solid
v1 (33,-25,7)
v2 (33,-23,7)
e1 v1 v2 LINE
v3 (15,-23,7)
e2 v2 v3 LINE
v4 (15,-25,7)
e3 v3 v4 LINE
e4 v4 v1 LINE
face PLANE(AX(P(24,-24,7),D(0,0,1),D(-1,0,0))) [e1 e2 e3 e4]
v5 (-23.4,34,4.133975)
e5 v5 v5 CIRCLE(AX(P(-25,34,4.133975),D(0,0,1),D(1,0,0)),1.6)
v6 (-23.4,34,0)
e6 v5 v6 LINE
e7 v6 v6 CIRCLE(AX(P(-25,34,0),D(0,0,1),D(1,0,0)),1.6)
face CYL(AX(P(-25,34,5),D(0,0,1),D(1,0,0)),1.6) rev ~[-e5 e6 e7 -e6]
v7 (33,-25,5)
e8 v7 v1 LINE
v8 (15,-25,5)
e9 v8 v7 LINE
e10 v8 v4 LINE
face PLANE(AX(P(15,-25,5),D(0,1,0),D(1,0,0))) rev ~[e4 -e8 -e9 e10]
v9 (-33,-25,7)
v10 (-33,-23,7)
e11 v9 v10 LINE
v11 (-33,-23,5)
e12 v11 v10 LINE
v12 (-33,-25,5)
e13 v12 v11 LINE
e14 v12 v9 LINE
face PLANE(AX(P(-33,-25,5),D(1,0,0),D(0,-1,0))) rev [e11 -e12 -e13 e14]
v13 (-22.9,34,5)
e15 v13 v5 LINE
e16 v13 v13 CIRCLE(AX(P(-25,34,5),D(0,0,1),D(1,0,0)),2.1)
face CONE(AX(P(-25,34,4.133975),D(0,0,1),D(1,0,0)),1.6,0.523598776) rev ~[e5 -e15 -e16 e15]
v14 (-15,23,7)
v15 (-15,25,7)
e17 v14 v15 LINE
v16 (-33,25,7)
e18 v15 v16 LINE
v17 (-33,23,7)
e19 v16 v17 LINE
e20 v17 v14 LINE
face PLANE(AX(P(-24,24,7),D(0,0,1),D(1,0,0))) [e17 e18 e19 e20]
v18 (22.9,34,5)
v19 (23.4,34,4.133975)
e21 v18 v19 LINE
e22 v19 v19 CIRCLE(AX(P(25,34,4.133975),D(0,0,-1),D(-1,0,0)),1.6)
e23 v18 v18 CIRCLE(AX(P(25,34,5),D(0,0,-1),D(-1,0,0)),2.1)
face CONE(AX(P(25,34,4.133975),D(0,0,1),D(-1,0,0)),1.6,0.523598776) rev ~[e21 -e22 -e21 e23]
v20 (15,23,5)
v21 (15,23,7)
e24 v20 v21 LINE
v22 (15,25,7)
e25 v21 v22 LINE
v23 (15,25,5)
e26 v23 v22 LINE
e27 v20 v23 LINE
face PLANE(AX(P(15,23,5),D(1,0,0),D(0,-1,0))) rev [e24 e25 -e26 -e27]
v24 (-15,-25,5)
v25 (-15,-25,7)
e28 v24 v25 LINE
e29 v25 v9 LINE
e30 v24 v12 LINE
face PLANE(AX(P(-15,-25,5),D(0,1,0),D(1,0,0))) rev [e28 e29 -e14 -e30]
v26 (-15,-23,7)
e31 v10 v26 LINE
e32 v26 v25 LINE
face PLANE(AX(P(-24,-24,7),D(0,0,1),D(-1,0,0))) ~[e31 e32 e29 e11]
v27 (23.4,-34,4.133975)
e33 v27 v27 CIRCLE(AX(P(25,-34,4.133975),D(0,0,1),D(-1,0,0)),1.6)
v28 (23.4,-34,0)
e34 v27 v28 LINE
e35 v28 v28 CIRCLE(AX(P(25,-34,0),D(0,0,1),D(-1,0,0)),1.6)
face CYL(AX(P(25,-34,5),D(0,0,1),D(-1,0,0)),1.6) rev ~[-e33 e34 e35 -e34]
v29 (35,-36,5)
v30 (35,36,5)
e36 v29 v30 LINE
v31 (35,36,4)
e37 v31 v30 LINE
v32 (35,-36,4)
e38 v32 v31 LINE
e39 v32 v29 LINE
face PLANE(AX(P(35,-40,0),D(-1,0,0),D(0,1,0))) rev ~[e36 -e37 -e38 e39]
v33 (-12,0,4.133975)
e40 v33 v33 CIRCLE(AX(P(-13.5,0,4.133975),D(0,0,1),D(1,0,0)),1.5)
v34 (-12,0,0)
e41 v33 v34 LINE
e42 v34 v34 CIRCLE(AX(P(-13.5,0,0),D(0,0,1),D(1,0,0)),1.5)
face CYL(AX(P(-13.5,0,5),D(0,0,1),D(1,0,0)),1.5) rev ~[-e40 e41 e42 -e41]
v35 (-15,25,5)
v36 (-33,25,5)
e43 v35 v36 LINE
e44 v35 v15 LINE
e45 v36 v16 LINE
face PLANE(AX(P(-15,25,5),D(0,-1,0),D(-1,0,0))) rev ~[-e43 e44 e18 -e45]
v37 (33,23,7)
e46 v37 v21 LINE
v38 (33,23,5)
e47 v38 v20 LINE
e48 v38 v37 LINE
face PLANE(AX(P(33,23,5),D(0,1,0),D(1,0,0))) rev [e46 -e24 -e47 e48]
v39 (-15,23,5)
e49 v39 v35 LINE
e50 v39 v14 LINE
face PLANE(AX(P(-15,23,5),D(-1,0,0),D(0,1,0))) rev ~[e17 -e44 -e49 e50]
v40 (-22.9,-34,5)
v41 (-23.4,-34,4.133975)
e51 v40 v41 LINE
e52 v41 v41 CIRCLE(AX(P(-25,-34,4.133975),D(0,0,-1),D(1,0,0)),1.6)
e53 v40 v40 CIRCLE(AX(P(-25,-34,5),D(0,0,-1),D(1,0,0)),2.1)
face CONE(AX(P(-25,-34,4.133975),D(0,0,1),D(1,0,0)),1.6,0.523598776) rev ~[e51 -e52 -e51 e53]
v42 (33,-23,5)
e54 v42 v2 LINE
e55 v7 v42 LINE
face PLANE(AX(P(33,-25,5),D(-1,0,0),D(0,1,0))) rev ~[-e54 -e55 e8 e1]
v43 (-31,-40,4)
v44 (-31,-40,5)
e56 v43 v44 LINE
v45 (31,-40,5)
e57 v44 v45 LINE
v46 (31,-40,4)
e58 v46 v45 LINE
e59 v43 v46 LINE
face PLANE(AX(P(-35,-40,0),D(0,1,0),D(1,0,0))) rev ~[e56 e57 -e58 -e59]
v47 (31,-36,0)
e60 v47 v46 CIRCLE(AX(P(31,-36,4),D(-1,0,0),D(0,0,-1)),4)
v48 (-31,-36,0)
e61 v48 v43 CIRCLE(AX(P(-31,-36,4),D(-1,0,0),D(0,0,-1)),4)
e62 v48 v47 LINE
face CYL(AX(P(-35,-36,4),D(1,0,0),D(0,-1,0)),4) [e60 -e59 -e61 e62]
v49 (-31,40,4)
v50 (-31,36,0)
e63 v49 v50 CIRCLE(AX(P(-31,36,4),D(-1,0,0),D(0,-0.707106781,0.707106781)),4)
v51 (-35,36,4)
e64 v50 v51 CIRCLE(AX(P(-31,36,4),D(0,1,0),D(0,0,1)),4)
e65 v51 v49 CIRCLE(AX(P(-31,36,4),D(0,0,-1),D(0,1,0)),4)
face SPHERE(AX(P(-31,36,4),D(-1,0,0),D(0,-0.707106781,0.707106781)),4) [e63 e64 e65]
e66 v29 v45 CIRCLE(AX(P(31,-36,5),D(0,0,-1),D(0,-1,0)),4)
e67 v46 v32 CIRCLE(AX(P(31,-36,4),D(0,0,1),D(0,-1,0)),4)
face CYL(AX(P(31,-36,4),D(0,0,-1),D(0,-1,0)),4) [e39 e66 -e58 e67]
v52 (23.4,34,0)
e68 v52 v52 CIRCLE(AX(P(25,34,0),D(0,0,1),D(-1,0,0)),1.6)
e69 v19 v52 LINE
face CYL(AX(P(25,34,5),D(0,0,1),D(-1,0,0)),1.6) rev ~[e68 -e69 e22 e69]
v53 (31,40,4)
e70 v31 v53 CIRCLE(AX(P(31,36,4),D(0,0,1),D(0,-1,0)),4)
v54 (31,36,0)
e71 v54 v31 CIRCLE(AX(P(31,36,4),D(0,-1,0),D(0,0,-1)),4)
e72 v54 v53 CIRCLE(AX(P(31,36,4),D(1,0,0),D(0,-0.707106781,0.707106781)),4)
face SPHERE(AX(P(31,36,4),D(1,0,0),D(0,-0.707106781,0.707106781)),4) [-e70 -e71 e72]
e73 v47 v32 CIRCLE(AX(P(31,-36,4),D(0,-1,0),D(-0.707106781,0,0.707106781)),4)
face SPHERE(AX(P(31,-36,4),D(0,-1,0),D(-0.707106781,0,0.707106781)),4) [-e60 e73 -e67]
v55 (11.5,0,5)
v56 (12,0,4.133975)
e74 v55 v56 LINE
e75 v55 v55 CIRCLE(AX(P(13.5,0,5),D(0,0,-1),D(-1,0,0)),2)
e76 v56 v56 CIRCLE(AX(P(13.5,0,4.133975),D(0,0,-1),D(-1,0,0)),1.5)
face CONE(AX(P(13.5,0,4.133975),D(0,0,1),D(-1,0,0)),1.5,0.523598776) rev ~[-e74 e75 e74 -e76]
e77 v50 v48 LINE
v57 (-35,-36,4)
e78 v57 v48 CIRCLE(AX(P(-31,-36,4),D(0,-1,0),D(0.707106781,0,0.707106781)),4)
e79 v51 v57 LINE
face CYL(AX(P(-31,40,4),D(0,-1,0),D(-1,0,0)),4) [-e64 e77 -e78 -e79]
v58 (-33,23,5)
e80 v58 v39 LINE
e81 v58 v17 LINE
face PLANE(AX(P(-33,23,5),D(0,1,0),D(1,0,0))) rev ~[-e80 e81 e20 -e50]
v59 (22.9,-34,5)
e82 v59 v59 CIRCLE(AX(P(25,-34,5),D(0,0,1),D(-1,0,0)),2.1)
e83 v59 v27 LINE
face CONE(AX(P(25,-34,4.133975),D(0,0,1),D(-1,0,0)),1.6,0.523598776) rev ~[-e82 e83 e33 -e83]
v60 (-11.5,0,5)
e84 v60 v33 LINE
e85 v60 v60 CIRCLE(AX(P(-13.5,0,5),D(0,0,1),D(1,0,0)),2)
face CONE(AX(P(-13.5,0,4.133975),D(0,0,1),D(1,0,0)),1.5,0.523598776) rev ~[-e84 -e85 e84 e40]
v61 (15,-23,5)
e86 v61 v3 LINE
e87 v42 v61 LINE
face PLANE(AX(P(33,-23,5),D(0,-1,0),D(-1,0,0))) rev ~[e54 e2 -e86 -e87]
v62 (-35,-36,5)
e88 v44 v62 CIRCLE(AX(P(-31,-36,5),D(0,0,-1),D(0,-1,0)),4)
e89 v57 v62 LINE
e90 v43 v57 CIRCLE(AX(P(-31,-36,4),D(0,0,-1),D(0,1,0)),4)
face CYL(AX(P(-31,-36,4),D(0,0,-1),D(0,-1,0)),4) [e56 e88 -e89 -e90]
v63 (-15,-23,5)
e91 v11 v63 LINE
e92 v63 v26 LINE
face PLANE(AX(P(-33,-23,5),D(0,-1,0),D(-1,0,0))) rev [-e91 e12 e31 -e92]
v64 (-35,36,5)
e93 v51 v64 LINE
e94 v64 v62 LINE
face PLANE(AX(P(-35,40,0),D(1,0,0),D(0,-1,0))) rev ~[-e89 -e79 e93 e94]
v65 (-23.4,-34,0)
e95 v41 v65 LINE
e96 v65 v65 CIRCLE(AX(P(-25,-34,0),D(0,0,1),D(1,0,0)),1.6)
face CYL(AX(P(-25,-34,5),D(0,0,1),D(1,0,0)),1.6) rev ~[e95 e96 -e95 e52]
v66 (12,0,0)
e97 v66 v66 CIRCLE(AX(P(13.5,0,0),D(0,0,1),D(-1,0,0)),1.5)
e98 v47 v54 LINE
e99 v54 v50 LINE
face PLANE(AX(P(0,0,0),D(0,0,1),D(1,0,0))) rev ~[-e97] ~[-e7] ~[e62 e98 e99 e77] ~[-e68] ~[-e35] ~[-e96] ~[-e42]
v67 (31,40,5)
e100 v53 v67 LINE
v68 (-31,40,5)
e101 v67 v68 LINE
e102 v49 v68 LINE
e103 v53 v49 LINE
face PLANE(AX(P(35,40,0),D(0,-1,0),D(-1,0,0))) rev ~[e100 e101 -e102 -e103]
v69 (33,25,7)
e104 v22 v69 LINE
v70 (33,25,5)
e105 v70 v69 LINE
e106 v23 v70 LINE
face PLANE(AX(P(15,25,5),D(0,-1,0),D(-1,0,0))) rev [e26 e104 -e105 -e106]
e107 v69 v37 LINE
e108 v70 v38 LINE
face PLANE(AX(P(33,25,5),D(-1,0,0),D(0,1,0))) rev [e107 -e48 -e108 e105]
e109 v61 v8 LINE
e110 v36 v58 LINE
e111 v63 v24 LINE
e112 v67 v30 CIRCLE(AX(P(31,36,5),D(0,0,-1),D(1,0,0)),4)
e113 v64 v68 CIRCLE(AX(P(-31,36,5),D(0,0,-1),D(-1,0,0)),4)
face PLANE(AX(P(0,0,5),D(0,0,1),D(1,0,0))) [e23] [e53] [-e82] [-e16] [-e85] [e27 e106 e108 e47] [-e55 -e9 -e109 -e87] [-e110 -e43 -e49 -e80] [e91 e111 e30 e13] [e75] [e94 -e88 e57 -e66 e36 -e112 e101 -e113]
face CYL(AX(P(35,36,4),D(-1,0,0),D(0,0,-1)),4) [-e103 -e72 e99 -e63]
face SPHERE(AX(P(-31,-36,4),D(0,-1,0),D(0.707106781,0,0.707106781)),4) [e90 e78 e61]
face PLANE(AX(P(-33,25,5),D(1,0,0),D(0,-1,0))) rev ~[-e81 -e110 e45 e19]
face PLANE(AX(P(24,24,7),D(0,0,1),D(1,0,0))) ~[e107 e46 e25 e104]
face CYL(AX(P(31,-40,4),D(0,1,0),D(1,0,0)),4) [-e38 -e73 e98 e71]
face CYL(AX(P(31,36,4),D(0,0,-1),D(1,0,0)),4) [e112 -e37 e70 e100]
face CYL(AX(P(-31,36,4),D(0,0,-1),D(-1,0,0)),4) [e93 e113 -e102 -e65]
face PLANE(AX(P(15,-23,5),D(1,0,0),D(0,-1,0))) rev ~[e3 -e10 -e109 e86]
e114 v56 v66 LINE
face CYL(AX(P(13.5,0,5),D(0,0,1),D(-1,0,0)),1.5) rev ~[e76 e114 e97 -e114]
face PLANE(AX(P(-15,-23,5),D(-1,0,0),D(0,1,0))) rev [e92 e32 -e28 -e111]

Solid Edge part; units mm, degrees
sketch "Sketch1" plane through (0, 0, 0) normal (0, 0, 1) x (1, 0, 0)
  line L0 (-35, -40) -> (35, -40)
  line L1 (35, -40) -> (35, 40)
  line L2 (35, 40) -> (-35, 40)
  line L3 (-35, 40) -> (-35, -40)
  dimension "D1" = 80
  dimension "D2" = 70
extrude "Protrusion1" add sketch "Sketch1" along normal blind 5
sketch "Sketch2" plane through (0, 0, 5) normal (0, 0, 1) x (1, 0, 0)
  circle A0 centre (-25, 34) radius 1.6
  dimension "D1" = 6
  dimension "D2" = 10
  dimension "D3" = 3.2
extrude "Cutout1" cut sketch "Sketch2" against normal through all
mirror "Mirror1" about plane through (0, 0, 0) normal (1, 0, 0) of "Cutout1"
mirror "Mirror2" about plane through (0, 0, 0) normal (0, -1, 0) of "Cutout1", "Mirror1"
sketch "Sketch3" plane through (0, 0, 5) normal (0, 0, 1) x (1, 0, 0)
  circle A0 centre (-13.5, 0) radius 1.5
  dimension "D1" = 3
  dimension "D2" = 13.5
extrude "Cutout2" cut sketch "Sketch3" against normal through all
mirror "Mirror3" about plane through (0, 0, 0) normal (1, 0, 0) of "Cutout2"
sketch "Sketch4" plane through (0, 0, 5) normal (0, 0, 1) x (1, 0, 0)
  line L0 (-33, 23) -> (-15, 23)
  line L1 (-15, 23) -> (-15, 25)
  line L2 (-15, 25) -> (-33, 25)
  line L3 (-33, 25) -> (-33, 23)
  dimension "D1" = 18
  dimension "D2" = 2
  dimension "D3" = 2
  dimension "D4" = 15
extrude "Extrusionsausprägung_2" add sketch "Sketch4" along normal blind 2
mirror "Mirror4" about plane through (0, 0, 0) normal (0, -1, 0) of "Extrusionsausprägung_2"
mirror "Mirror5" about plane through (0, 0, 0) normal (1, 0, 0) of "Mirror4", "Extrusionsausprägung_2"
fillet "Verrundung_1" radius 4 4 edges at (0, 40, 0) (35, 0, 0) (-35, 0, 0) (0, -40, 0)
fillet "Verrundung_2" radius 4 8 edges at (33.8284, 38.8284, 1.1716) (35, 40, 4.5) (33.8284, -38.8284, 1.1716) (35, -40, 4.5) (-33.8284, -38.8284, 1.1716) (-35, -40, 4.5) (-33.8284, 38.8284, 1.1716) (-35, 40, 4.5)
chamfer "Fase_1" distance 0.5 angle 60 2 edges at (15, 0, 5) (-15, 0, 5) measured on face at (-24.0333, -25.8667, 5)
chamfer "Fase_2" distance 0.5 angle 60 4 edges at (26.6, -34, 5) (-26.6, -34, 5) (-26.6, 34, 5) (26.6, 34, 5) measured on face at (-24.0333, -25.8667, 5)
properties material "Nylon, allgemein"
